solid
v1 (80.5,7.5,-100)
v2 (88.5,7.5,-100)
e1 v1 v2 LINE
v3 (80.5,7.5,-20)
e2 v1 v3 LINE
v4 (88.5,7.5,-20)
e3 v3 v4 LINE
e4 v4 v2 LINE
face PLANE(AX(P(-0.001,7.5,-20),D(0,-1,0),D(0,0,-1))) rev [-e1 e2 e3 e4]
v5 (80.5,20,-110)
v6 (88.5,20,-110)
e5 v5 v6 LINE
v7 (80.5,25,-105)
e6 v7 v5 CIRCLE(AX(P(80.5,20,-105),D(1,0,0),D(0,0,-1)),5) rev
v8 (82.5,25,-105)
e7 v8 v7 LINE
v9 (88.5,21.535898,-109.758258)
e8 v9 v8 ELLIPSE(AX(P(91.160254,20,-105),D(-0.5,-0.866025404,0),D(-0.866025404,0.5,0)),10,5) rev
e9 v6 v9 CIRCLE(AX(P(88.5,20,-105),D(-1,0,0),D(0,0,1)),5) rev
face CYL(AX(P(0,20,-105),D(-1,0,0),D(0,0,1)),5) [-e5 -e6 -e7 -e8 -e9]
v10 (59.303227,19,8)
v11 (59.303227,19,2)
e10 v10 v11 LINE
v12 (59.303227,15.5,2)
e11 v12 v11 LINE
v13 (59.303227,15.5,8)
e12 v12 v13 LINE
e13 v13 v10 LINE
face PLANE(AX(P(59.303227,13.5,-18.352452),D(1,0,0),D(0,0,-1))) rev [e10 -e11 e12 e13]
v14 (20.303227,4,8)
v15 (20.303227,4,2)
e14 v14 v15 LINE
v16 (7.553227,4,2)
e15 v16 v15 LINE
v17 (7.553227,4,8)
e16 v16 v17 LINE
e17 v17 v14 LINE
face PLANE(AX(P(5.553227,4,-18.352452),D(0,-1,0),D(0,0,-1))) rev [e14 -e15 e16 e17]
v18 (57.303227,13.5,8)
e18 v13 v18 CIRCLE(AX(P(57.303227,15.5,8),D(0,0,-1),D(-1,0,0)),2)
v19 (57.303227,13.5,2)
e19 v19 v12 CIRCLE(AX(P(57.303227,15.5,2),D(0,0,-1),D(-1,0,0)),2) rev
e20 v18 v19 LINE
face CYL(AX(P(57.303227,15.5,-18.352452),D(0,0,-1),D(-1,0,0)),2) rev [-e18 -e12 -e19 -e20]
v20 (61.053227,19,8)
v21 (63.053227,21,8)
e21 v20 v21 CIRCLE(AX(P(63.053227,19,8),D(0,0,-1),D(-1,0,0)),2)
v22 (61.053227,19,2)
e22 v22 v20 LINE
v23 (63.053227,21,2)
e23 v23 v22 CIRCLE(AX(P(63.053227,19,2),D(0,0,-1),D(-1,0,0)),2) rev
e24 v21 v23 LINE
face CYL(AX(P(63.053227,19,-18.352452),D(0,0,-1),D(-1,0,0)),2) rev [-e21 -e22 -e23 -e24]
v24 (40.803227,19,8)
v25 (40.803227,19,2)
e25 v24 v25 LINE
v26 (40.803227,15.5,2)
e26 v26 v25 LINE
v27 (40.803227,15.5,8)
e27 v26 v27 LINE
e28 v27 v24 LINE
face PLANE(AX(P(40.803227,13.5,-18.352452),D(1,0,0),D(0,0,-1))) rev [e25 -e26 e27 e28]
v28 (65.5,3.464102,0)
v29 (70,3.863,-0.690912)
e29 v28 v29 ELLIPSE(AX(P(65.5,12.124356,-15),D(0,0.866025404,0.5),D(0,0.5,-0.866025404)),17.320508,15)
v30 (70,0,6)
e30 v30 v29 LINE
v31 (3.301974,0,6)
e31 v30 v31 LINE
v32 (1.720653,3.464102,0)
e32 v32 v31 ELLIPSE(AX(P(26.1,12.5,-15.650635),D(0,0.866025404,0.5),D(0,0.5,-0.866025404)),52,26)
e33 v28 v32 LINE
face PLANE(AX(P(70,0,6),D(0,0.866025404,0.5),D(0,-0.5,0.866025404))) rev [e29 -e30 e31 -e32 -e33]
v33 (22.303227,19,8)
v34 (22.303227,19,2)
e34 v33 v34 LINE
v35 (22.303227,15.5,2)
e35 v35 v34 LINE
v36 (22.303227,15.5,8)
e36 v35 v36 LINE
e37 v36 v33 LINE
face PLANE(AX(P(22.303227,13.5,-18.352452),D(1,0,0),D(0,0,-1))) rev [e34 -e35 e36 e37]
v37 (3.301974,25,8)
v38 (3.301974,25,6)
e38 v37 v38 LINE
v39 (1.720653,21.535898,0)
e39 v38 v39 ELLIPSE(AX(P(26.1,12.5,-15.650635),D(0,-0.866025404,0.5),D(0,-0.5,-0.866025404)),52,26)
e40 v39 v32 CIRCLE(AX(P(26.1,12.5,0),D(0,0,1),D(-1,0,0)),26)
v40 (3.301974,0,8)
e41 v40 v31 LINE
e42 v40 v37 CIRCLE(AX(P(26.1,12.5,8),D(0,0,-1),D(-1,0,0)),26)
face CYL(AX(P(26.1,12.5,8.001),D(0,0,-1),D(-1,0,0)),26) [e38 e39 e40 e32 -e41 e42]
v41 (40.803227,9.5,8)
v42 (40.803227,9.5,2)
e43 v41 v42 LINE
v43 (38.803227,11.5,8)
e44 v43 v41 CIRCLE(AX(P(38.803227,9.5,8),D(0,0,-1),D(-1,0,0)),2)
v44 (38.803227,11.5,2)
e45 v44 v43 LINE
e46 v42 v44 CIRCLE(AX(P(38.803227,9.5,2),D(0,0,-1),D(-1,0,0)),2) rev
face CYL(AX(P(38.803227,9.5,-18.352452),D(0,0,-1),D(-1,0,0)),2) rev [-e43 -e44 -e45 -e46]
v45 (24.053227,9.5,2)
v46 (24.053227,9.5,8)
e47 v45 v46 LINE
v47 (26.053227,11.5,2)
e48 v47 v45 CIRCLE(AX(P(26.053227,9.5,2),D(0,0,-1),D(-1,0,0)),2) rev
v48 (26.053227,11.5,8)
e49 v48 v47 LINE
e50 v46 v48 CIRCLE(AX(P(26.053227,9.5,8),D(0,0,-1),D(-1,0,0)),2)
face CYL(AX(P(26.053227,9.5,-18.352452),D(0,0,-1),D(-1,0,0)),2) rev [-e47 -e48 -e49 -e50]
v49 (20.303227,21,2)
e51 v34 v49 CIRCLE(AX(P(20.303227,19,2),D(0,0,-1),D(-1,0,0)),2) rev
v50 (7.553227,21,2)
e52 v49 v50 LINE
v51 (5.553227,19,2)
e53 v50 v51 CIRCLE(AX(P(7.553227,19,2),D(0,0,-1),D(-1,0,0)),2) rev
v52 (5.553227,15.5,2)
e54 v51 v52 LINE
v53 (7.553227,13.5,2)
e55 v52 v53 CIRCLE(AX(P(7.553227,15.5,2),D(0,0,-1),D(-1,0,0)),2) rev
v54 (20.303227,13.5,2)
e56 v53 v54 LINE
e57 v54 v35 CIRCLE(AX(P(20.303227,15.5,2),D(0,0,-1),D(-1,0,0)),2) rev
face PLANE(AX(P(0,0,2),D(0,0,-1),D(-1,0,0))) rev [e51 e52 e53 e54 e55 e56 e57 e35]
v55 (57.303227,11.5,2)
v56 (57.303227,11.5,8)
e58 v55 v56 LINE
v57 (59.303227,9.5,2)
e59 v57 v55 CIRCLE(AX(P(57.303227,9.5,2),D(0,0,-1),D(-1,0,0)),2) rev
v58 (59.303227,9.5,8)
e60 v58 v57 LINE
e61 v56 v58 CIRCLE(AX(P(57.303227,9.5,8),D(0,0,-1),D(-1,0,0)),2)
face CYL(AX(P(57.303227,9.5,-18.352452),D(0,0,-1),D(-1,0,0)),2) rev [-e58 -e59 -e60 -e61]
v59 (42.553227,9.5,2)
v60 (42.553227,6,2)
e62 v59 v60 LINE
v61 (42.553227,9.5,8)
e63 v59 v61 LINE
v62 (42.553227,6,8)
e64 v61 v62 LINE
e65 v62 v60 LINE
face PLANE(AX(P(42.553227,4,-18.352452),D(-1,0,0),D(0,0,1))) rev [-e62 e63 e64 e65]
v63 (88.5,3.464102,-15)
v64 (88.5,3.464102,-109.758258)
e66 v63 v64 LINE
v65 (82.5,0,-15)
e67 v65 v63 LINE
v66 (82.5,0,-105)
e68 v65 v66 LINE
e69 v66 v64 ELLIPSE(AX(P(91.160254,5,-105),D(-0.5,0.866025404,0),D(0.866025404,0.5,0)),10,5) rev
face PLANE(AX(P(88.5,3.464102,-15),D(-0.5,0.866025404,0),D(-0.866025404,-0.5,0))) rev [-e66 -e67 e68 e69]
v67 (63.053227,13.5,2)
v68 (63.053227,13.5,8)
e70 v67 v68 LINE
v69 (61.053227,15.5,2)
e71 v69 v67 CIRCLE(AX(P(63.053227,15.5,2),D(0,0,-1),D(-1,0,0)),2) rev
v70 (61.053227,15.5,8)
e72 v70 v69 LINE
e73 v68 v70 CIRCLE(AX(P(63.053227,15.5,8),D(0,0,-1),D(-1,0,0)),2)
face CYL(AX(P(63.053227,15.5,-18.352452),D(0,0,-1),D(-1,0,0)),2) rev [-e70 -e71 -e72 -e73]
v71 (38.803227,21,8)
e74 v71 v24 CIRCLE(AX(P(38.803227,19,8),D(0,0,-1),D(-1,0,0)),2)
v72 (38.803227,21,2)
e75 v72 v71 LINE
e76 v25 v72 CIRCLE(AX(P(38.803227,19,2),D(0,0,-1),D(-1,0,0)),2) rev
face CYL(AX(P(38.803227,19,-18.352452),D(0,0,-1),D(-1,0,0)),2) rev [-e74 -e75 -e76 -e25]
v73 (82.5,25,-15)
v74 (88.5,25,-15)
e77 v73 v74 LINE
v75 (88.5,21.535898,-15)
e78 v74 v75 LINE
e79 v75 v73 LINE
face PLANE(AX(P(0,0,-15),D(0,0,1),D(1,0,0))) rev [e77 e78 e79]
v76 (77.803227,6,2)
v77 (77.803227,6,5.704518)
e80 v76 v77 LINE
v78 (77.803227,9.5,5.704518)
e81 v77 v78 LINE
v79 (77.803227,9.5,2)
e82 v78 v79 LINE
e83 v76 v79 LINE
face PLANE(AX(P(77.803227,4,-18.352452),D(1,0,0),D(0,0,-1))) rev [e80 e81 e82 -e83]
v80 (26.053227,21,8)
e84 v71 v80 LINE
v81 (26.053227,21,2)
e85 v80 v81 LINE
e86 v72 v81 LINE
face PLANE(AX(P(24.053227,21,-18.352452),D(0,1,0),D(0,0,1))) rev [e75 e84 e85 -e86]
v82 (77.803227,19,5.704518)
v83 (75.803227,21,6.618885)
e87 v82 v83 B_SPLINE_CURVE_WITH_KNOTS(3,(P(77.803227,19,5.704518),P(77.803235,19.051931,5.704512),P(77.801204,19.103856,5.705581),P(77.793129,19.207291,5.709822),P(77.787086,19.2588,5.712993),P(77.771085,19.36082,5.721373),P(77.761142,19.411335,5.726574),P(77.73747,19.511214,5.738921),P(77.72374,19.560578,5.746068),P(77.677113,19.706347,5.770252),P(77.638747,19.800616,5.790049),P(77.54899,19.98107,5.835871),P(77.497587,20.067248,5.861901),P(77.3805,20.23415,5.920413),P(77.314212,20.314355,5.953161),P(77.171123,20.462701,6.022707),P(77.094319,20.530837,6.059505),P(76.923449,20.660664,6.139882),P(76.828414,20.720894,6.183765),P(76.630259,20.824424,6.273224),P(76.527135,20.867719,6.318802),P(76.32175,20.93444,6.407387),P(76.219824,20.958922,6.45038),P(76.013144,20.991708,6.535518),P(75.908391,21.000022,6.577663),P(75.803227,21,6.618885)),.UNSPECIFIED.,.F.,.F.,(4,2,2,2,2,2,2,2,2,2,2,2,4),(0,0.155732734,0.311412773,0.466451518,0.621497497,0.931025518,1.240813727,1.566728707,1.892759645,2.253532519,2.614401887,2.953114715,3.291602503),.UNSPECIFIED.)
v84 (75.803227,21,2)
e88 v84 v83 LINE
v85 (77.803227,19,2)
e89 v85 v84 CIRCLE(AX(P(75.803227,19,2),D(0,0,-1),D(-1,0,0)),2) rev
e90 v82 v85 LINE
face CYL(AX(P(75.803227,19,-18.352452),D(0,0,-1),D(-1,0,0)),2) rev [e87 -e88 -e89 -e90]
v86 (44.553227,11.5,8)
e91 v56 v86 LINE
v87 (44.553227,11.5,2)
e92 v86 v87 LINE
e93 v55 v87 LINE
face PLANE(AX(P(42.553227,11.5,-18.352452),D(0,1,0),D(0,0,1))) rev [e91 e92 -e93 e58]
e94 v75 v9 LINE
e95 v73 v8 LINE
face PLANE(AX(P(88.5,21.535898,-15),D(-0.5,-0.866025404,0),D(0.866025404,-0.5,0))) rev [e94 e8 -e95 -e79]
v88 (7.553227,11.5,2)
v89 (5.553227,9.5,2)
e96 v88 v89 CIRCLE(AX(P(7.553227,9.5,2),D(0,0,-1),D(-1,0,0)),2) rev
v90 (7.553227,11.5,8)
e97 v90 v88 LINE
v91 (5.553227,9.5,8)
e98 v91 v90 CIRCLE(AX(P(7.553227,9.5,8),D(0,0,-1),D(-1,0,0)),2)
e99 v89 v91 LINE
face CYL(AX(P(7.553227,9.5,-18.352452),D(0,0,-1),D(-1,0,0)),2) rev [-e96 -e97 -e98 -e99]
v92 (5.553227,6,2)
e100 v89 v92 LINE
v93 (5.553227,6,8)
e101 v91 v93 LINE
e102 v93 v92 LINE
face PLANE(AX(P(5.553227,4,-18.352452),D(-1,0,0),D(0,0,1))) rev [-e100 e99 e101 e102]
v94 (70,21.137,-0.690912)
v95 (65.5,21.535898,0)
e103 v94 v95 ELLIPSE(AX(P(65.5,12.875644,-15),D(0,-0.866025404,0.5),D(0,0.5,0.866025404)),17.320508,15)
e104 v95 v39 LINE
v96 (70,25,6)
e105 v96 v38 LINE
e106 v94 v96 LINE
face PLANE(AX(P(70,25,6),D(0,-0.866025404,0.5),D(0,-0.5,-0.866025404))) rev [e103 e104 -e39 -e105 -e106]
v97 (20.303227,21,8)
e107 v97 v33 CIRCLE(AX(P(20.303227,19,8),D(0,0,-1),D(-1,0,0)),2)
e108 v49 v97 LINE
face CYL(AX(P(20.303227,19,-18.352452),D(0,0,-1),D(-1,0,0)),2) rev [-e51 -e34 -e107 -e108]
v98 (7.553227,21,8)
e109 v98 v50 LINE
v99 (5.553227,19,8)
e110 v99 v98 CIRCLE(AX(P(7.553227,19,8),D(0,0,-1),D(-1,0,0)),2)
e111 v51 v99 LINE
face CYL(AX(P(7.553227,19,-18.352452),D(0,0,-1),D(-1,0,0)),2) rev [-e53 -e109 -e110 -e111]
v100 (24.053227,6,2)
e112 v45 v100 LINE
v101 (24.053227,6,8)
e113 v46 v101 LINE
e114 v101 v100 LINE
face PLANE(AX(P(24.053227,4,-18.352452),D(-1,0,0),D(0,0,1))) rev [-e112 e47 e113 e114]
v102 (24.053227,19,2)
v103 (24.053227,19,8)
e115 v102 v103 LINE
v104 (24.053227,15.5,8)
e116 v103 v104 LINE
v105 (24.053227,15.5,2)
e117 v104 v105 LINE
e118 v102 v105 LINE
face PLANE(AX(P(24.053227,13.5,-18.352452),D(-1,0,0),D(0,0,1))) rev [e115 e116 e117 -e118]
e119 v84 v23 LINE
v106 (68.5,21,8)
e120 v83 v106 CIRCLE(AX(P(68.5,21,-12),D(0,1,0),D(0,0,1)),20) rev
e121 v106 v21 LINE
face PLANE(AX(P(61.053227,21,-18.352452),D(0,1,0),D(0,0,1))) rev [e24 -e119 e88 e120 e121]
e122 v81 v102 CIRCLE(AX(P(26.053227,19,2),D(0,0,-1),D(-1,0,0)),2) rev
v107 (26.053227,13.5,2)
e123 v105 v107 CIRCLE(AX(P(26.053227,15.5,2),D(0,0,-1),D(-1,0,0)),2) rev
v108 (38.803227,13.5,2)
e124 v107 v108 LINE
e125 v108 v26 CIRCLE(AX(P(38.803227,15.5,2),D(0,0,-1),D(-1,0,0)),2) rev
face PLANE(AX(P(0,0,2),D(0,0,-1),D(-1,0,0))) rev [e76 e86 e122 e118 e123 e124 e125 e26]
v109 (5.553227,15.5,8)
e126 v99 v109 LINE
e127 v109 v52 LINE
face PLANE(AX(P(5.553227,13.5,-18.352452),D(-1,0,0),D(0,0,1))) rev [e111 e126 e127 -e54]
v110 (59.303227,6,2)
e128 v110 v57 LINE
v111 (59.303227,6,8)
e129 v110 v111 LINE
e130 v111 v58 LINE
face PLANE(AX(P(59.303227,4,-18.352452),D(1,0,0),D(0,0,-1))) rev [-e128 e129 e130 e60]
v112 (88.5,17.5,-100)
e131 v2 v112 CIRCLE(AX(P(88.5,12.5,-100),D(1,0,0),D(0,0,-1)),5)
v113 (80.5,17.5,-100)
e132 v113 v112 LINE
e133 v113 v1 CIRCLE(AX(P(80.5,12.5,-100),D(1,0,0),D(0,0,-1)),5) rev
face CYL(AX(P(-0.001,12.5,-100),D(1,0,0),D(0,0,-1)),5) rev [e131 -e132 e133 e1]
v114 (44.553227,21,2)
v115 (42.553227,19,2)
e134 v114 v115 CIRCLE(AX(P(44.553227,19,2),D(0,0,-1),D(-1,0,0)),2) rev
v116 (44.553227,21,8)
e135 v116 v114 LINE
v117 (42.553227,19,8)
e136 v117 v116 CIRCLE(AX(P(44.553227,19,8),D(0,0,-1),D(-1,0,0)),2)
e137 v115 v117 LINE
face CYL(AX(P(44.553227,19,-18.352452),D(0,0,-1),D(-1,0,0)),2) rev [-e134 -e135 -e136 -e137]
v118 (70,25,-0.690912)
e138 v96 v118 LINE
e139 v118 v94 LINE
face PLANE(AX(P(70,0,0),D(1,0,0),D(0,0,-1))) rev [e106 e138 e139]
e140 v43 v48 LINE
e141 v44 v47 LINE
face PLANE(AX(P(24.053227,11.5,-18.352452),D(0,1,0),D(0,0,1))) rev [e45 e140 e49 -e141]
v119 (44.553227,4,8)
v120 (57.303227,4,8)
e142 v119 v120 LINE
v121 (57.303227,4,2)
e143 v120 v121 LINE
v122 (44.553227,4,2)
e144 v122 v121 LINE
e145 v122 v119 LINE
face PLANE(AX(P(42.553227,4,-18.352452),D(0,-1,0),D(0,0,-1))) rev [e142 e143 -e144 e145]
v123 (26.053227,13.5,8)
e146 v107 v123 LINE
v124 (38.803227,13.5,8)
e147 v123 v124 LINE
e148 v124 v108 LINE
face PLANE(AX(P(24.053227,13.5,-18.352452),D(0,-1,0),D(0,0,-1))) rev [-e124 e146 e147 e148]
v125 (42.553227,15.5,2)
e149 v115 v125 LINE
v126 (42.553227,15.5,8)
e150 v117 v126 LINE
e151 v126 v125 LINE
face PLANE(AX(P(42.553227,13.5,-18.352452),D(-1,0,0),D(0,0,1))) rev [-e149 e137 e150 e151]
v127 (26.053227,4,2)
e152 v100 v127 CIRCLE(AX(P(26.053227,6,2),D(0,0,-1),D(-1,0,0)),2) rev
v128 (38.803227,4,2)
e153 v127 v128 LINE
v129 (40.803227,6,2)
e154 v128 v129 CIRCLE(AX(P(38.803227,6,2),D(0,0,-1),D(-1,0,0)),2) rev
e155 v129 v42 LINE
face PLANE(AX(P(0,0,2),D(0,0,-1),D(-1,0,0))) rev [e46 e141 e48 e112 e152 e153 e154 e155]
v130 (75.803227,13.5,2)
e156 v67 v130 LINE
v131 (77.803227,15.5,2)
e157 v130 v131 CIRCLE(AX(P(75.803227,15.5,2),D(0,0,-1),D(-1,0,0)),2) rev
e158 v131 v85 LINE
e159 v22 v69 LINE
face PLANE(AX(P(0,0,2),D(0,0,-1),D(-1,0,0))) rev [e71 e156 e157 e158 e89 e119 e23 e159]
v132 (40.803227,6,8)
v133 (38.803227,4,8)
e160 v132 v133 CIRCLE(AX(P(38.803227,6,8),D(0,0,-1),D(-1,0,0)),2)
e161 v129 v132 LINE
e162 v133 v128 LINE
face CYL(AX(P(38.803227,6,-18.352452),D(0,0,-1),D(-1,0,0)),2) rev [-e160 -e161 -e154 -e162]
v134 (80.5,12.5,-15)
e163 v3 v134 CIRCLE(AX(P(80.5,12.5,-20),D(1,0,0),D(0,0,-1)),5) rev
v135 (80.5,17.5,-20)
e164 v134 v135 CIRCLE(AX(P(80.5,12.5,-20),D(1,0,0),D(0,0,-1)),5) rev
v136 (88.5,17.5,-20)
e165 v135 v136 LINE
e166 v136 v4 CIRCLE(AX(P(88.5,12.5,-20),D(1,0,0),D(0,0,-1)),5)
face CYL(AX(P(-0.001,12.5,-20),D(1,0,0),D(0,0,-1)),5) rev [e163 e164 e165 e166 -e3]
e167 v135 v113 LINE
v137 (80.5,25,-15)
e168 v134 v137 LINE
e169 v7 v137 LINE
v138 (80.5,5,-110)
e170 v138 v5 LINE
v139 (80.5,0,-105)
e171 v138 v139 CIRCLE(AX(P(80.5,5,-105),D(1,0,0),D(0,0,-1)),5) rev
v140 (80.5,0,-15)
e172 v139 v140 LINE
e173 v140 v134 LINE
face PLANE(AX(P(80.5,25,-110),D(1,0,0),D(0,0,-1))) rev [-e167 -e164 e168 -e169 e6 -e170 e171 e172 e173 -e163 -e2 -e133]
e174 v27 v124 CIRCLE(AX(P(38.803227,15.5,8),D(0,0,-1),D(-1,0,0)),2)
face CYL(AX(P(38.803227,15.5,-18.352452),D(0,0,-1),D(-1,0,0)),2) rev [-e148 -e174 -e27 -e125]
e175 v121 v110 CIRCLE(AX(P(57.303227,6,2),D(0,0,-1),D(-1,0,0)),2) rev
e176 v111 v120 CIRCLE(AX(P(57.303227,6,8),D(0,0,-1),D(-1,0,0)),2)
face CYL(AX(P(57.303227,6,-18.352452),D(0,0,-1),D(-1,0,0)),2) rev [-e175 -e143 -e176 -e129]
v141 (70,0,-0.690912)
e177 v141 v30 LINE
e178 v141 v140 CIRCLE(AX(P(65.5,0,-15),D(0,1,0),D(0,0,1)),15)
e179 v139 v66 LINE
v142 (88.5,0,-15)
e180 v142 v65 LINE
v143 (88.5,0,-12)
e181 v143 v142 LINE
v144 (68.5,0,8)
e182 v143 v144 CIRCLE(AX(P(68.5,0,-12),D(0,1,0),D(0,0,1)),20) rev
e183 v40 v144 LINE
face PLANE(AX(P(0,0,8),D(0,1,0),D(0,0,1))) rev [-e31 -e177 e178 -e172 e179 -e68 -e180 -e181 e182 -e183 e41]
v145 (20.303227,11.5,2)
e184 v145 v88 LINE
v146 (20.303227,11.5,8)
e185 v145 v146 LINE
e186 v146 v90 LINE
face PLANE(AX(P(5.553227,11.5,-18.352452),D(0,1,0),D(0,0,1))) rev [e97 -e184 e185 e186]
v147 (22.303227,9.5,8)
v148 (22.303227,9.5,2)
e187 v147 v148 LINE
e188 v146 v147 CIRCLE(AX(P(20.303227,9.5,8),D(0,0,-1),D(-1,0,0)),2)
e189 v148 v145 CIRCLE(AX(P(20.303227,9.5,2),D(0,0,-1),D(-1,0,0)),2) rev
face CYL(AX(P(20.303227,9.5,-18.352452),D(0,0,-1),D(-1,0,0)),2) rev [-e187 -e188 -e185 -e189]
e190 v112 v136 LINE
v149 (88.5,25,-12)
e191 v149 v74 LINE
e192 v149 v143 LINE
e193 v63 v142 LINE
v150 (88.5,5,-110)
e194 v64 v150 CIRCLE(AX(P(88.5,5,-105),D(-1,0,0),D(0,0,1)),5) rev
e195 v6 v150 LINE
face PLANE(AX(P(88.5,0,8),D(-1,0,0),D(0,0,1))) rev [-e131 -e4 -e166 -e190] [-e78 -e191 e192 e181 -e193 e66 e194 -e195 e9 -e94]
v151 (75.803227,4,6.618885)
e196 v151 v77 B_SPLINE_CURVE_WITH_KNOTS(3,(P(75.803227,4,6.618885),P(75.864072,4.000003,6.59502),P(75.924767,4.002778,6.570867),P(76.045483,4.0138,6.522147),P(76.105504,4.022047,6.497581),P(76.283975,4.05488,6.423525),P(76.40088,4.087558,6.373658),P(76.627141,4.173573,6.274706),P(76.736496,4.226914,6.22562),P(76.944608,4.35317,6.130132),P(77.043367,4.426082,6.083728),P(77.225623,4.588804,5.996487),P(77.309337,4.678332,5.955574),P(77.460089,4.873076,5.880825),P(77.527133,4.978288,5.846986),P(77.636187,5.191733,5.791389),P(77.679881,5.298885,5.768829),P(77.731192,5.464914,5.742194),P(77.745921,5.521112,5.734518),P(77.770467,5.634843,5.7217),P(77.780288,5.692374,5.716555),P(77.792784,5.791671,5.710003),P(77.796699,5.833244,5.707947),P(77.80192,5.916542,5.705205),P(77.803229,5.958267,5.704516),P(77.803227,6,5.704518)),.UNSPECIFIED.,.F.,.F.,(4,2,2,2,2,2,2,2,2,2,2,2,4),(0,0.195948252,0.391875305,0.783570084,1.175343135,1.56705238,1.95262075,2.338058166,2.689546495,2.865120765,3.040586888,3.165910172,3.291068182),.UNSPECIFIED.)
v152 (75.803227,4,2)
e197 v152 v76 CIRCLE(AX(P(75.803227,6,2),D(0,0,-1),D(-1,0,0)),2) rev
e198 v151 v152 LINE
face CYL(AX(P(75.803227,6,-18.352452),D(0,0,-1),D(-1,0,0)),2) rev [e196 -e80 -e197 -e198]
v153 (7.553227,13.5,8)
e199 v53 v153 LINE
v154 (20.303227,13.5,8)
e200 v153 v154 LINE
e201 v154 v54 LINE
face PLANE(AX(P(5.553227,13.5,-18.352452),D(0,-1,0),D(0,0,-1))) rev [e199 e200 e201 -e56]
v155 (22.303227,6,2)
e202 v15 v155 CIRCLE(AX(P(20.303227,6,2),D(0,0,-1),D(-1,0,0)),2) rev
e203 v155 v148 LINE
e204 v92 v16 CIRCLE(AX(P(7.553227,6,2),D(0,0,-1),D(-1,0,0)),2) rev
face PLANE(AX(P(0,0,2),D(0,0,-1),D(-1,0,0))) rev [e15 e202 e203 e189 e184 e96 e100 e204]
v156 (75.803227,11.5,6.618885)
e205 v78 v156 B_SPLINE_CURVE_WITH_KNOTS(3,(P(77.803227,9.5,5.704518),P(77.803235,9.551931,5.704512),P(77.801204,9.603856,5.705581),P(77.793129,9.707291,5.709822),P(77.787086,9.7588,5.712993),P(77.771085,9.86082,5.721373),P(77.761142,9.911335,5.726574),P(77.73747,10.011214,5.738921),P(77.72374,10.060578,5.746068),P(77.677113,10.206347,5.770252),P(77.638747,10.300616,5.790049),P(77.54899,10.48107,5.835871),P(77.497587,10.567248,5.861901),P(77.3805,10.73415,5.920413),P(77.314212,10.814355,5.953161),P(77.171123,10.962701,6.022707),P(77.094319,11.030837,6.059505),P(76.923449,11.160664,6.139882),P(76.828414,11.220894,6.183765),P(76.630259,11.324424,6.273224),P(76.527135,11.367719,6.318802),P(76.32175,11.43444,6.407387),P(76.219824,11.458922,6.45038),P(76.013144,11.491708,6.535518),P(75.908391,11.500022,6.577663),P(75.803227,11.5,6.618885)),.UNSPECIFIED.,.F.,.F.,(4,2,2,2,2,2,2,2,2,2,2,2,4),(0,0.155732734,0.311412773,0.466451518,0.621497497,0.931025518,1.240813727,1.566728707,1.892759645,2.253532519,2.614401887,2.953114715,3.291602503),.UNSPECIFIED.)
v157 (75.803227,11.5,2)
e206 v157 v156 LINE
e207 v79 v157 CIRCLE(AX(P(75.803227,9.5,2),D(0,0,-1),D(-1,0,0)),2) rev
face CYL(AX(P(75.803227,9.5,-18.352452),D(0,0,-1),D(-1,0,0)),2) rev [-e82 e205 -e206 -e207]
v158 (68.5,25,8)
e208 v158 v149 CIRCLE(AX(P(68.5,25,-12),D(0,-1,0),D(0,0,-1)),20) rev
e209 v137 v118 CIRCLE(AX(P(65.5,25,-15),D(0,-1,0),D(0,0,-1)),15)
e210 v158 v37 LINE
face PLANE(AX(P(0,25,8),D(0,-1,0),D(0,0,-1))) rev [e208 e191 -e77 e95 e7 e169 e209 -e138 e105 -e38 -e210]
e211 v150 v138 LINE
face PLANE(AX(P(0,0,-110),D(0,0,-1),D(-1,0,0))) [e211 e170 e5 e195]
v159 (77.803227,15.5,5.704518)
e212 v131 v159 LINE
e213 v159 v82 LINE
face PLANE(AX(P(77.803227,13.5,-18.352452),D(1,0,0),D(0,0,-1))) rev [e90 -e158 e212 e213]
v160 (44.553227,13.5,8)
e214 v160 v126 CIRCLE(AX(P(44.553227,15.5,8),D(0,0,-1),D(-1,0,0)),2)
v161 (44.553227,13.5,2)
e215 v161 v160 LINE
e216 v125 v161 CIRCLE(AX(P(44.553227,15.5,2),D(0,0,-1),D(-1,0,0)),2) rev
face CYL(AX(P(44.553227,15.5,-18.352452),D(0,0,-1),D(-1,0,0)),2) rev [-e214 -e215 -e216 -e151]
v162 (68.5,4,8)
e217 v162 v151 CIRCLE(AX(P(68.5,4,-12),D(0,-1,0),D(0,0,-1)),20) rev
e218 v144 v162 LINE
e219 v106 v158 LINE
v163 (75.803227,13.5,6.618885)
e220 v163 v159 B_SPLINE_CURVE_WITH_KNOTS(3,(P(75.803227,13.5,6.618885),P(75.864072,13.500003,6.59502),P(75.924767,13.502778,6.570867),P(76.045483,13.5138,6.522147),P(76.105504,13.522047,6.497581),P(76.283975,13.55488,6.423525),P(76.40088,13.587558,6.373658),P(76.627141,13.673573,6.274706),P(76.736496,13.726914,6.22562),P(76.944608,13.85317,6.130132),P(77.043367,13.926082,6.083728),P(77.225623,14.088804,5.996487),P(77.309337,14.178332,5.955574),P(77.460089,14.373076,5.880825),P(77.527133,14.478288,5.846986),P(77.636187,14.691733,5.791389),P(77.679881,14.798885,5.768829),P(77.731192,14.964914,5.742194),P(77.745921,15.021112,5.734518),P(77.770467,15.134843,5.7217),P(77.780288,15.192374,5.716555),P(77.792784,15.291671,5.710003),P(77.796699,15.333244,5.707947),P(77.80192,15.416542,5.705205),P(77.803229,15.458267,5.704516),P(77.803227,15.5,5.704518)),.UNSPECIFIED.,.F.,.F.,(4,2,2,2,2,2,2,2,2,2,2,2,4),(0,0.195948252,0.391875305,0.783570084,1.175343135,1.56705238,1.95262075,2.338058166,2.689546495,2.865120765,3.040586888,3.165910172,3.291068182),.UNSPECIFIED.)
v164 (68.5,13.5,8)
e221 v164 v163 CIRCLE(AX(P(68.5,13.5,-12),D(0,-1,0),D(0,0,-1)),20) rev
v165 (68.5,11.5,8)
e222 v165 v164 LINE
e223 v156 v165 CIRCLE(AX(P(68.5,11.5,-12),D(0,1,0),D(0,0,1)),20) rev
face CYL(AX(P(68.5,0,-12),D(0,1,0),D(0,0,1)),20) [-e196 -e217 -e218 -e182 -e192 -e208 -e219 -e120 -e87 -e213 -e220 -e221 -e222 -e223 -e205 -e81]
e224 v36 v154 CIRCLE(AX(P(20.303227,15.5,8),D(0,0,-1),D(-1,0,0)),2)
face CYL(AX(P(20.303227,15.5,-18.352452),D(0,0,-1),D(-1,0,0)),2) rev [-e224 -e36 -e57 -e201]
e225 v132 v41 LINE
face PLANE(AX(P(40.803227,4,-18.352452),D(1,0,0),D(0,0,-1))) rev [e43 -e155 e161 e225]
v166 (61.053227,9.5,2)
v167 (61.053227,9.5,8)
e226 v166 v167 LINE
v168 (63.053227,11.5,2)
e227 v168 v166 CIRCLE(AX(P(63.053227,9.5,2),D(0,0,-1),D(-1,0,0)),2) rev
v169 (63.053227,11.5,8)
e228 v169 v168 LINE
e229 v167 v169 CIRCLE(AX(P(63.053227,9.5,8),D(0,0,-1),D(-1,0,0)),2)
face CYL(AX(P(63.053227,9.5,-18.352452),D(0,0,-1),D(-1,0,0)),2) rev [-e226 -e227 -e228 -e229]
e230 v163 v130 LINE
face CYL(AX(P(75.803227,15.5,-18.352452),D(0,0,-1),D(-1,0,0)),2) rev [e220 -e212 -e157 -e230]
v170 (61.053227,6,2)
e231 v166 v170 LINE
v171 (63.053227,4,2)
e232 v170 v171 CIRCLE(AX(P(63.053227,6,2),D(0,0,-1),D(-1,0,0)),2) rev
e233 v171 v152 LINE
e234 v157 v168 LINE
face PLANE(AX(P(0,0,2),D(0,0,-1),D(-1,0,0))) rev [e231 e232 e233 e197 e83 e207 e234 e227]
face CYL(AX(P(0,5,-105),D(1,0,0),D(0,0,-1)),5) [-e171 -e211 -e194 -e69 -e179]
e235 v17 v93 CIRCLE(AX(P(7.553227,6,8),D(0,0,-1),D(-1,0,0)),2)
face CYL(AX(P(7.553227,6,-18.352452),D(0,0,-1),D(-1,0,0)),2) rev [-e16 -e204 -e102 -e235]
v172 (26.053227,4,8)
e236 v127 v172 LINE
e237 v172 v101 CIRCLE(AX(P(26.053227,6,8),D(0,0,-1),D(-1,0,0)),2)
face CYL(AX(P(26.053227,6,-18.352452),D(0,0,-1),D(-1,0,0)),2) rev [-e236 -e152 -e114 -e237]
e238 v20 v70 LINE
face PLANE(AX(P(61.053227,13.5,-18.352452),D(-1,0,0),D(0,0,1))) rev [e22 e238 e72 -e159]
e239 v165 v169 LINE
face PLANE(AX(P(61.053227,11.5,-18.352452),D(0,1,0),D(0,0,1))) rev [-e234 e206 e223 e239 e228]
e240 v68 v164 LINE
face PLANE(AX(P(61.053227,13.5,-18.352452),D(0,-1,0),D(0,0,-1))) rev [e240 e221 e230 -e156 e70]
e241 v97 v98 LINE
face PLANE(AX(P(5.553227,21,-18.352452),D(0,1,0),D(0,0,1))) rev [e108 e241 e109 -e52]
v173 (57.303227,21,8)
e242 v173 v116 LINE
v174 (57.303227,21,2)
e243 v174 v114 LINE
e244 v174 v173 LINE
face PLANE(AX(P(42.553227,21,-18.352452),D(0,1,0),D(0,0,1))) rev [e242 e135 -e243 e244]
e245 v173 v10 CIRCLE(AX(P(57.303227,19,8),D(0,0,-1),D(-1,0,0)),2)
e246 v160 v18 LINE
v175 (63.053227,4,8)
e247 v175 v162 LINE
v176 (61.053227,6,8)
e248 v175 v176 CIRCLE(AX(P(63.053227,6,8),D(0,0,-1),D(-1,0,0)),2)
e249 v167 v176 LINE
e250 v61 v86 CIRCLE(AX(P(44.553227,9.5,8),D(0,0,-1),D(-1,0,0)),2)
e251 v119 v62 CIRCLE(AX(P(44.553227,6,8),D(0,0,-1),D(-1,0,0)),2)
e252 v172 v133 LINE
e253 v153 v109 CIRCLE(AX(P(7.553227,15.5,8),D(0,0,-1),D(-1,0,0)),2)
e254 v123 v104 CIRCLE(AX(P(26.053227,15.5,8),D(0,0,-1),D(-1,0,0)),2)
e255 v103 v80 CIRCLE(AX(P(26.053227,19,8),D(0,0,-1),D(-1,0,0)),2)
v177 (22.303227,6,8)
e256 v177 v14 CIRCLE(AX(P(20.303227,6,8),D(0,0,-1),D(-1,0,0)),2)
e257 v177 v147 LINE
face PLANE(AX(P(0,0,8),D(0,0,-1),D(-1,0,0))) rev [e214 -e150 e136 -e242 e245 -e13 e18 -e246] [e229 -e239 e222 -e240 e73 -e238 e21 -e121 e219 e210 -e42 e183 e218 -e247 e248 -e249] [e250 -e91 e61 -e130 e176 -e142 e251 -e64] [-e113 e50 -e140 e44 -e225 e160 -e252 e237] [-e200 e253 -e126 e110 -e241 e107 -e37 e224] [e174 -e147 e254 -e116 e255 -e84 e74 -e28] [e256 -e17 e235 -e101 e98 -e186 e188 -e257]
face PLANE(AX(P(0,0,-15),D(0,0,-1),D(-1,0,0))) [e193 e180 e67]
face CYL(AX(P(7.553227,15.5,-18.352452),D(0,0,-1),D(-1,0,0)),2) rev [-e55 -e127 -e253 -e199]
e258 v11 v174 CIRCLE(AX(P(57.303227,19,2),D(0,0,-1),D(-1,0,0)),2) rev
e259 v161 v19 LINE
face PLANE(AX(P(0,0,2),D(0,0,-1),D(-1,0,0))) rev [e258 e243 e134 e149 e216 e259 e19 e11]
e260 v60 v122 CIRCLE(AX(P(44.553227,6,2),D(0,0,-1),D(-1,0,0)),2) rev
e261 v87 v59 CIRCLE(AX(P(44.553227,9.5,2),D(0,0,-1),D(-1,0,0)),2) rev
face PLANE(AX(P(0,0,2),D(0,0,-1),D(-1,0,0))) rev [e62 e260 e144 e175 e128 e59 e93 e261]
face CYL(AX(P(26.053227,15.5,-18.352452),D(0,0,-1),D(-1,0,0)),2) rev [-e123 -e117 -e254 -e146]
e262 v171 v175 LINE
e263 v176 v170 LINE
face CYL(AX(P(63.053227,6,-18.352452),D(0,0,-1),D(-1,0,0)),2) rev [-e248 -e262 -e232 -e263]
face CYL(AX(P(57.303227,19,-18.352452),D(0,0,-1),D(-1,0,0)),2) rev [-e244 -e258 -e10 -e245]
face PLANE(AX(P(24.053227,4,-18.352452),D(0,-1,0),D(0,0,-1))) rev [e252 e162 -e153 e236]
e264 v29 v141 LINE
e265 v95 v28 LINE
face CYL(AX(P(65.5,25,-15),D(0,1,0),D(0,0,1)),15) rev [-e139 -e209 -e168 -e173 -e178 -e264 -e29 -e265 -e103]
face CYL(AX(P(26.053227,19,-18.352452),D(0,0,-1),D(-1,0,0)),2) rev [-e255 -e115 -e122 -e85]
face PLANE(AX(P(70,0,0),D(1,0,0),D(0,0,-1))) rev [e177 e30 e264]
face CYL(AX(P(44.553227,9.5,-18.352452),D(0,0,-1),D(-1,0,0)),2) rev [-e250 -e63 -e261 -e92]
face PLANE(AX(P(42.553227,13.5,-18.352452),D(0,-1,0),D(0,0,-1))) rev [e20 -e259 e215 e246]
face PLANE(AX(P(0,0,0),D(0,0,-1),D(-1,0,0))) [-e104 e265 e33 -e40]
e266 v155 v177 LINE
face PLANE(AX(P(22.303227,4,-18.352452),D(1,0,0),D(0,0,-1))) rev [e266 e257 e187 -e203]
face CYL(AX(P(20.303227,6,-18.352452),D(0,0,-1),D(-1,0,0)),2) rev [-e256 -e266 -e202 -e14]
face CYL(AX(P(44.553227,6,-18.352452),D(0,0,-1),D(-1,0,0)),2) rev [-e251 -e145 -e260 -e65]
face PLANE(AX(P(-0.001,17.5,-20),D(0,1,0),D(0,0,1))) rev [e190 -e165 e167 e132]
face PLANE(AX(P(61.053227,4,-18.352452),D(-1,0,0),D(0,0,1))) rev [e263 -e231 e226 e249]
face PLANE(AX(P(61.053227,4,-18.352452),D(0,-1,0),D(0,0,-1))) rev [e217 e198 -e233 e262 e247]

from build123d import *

# Parameters (mm, degrees)
SKETCH_1_W                     = 88.5
SKETCH_1_H                     = 25
EXTRUDE_1_DEPTH                = 8
CUT_EXTRUDE_2_DEPTH            = 70
SKETCH_9_W                     = 16.75
SKETCH_9_H                     = 7.5
CUT_EXTRUDE_3_DEPTH            = 6
FILLET_4_R                     = 2
PATTERN_LINEAR_1_COUNT         = 4
PATTERN_LINEAR_1_PITCH         = 18.5
PATTERN_LINEAR_1_COUNT_DIR2    = 2
PATTERN_LINEAR_1_PITCH_DIR2    = 9.5
FILLET_4_OF_PATTERN_LINEAR_1_R = 2
SKETCH_10_W                    = 8
SKETCH_10_H                    = 25
EXTRUDE_2_DEPTH                = 110
FILLET_5_R                     = 20
FILLET_6_R                     = 15
FILLET_7_R                     = 5
CUT_EXTRUDE_4_DEPTH            = 95
CUT_EXTRUDE_5_REACH            = 145.378
CUT_EXTRUDE_7_REACH            = 145.378


with BuildPart() as part:
    # Эскиз1 → Бобышка-Вытянуть1 (new body)
    with BuildSketch(Plane.XY):
        with Locations((44.25, 12.5)):
            Rectangle(SKETCH_1_W, SKETCH_1_H)
    extrude(amount=EXTRUDE_1_DEPTH)

    # Эскиз4 → Вырез-Вытянуть2 (cut)
    with BuildSketch(Plane.ZY):
        Polygon((6, 0), (0, 3.464101615), (0, 0), align=None)
        Polygon((0, 25), (6, 25), (0, 21.535898385), align=None)
    extrude(amount=-CUT_EXTRUDE_2_DEPTH, mode=Mode.SUBTRACT)

    # Эскиз9 → Вырез-Вытянуть3 (cut)
    with BuildSketch(Plane.XY.offset(8)):
        with Locations((13.928226592, 17.25)):
            Rectangle(SKETCH_9_W, SKETCH_9_H)
    cut_extrude_3 = extrude(amount=-CUT_EXTRUDE_3_DEPTH, mode=Mode.SUBTRACT)

    # Скругление4
    fillet_4_edges = [part.edges().sort_by_distance(p)[0] for p in [
        (22.303226592, 13.5, 5),
        (22.303226592, 21, 5),
        (5.553226592, 21, 5),
        (5.553226592, 13.5, 5),
    ]]
    fillet(fillet_4_edges, radius=FILLET_4_R)

    # Линейный массив1: Cut-Extrude 3 4 × 2
    with Locations(*[(i * PATTERN_LINEAR_1_PITCH, -j * PATTERN_LINEAR_1_PITCH_DIR2, 0) for i in range(PATTERN_LINEAR_1_COUNT) for j in range(PATTERN_LINEAR_1_COUNT_DIR2) if (i, j) != (0, 0)]):
        add(cut_extrude_3, mode=Mode.SUBTRACT)

    # Скругление4 of Линейный массив1
    fillet_4_of_pattern_linear_1_edges = [part.edges().sort_by_distance(p)[0] for p in [
        (22.303226592, 4, 5),
        (22.303226592, 11.5, 5),
        (5.553226592, 11.5, 5),
        (5.553226592, 4, 5),
        (40.803226592, 13.5, 5),
        (40.803226592, 21, 5),
        (24.053226592, 21, 5),
        (24.053226592, 13.5, 5),
        (40.803226592, 4, 5),
        (40.803226592, 11.5, 5),
        (24.053226592, 11.5, 5),
        (24.053226592, 4, 5),
        (59.303226592, 13.5, 5),
        (59.303226592, 21, 5),
        (42.553226592, 21, 5),
        (42.553226592, 13.5, 5),
        (59.303226592, 4, 5),
        (59.303226592, 11.5, 5),
        (42.553226592, 11.5, 5),
        (42.553226592, 4, 5),
        (77.803226592, 13.5, 5),
        (77.803226592, 21, 5),
        (61.053226592, 21, 5),
        (61.053226592, 13.5, 5),
        (77.803226592, 4, 5),
        (77.803226592, 11.5, 5),
        (61.053226592, 11.5, 5),
        (61.053226592, 4, 5),
    ]]
    fillet(fillet_4_of_pattern_linear_1_edges, radius=FILLET_4_OF_PATTERN_LINEAR_1_R)

    # Эскиз10 → Бобышка-Вытянуть2 (add)
    with BuildSketch(Plane(origin=(0, 0, 0), x_dir=(-1, 0, 0), z_dir=(0, 0, -1))):
        with Locations((-84.5, 12.5)):
            Rectangle(SKETCH_10_W, SKETCH_10_H)
    extrude(amount=EXTRUDE_2_DEPTH)

    # Скругление5
    # the kernel refuses this fillet: 20 mm, written as the material it takes off along each edge
    with BuildSketch(Plane(origin=(88.5, -50, 8), x_dir=(-1, 0, 0), z_dir=(0, 1, 0))) as fillet_5_piece_1:
        with BuildLine():
            CenterArc((FILLET_5_R, -FILLET_5_R), FILLET_5_R, 90, 90)
            Line((0, -FILLET_5_R), (0, 0))
            Line((0, 0), (FILLET_5_R, 0))
        make_face()
    extrude(amount=125, mode=Mode.SUBTRACT)

    # Скругление6
    fillet_6_edges = [part.edges().sort_by_distance(p)[0] for p in [
        (80.5, 12.5, 0),
    ]]
    fillet(fillet_6_edges, radius=FILLET_6_R)

    # Скругление7
    fillet_7_edges = [part.edges().sort_by_distance(p)[0] for p in [
        (84.5, 0, -110),
        (84.5, 25, -110),
    ]]
    fillet(fillet_7_edges, radius=FILLET_7_R)

    # Эскиз11 → Вырез-Вытянуть4 (cut)
    with BuildSketch(Plane(origin=(0, 0, -110), x_dir=(-1, 0, 0), z_dir=(0, 0, -1))):
        Polygon((-82.5, 25), (-88.5, 25), (-88.5, 21.535898385), align=None)
        Polygon((-88.5, 3.464101615), (-82.5, 0), (-88.5, 0), align=None)
    extrude(amount=-CUT_EXTRUDE_4_DEPTH, mode=Mode.SUBTRACT)

    # Эскиз12 → Вырез-Вытянуть5 (cut, up to next)
    with BuildSketch(Plane(origin=(88.5, 0, 0), x_dir=(0, 0, -1), z_dir=(1, 0, 0)), mode=Mode.PRIVATE) as cut_extrude_5_sk1:
        with BuildLine():
            Line((20, 17.5), (100, 17.5))
            ThreePointArc((100, 17.5), (105, 12.5), (100, 7.5))
            Line((100, 7.5), (20, 7.5))
            ThreePointArc((20, 7.5), (15, 12.5), (20, 17.5))
        make_face()
    cut_extrude_5_tool1 = extrude(cut_extrude_5_sk1.sketch, amount=-CUT_EXTRUDE_5_REACH, mode=Mode.PRIVATE) & part.part
    add(cut_extrude_5_tool1.solids().sort_by_distance((88.5, 12.5, -60))[0], mode=Mode.SUBTRACT)

    # Эскиз13 → Вырез-Вытянуть7 (cut, up to next)
    with BuildSketch(Plane(origin=(0, 0, 0), x_dir=(-1, 0, 0), z_dir=(0, 0, -1)), mode=Mode.PRIVATE) as cut_extrude_7_sk1:
        with BuildLine():
            Line((-3.30197377, 25), (0, 25))
            Line((0, 25), (0, 0))
            Line((0, 0), (-3.30197377, 0))
            ThreePointArc((-3.30197377, 0), (-0.1, 12.5), (-3.30197377, 25))
        make_face()
    cut_extrude_7_tool1 = extrude(cut_extrude_7_sk1.sketch, amount=-CUT_EXTRUDE_7_REACH, mode=Mode.PRIVATE) & part.part
    add(cut_extrude_7_tool1.solids().sort_by_distance((1.650987, 24.747829, 0))[0], mode=Mode.SUBTRACT)


solid = part.part
